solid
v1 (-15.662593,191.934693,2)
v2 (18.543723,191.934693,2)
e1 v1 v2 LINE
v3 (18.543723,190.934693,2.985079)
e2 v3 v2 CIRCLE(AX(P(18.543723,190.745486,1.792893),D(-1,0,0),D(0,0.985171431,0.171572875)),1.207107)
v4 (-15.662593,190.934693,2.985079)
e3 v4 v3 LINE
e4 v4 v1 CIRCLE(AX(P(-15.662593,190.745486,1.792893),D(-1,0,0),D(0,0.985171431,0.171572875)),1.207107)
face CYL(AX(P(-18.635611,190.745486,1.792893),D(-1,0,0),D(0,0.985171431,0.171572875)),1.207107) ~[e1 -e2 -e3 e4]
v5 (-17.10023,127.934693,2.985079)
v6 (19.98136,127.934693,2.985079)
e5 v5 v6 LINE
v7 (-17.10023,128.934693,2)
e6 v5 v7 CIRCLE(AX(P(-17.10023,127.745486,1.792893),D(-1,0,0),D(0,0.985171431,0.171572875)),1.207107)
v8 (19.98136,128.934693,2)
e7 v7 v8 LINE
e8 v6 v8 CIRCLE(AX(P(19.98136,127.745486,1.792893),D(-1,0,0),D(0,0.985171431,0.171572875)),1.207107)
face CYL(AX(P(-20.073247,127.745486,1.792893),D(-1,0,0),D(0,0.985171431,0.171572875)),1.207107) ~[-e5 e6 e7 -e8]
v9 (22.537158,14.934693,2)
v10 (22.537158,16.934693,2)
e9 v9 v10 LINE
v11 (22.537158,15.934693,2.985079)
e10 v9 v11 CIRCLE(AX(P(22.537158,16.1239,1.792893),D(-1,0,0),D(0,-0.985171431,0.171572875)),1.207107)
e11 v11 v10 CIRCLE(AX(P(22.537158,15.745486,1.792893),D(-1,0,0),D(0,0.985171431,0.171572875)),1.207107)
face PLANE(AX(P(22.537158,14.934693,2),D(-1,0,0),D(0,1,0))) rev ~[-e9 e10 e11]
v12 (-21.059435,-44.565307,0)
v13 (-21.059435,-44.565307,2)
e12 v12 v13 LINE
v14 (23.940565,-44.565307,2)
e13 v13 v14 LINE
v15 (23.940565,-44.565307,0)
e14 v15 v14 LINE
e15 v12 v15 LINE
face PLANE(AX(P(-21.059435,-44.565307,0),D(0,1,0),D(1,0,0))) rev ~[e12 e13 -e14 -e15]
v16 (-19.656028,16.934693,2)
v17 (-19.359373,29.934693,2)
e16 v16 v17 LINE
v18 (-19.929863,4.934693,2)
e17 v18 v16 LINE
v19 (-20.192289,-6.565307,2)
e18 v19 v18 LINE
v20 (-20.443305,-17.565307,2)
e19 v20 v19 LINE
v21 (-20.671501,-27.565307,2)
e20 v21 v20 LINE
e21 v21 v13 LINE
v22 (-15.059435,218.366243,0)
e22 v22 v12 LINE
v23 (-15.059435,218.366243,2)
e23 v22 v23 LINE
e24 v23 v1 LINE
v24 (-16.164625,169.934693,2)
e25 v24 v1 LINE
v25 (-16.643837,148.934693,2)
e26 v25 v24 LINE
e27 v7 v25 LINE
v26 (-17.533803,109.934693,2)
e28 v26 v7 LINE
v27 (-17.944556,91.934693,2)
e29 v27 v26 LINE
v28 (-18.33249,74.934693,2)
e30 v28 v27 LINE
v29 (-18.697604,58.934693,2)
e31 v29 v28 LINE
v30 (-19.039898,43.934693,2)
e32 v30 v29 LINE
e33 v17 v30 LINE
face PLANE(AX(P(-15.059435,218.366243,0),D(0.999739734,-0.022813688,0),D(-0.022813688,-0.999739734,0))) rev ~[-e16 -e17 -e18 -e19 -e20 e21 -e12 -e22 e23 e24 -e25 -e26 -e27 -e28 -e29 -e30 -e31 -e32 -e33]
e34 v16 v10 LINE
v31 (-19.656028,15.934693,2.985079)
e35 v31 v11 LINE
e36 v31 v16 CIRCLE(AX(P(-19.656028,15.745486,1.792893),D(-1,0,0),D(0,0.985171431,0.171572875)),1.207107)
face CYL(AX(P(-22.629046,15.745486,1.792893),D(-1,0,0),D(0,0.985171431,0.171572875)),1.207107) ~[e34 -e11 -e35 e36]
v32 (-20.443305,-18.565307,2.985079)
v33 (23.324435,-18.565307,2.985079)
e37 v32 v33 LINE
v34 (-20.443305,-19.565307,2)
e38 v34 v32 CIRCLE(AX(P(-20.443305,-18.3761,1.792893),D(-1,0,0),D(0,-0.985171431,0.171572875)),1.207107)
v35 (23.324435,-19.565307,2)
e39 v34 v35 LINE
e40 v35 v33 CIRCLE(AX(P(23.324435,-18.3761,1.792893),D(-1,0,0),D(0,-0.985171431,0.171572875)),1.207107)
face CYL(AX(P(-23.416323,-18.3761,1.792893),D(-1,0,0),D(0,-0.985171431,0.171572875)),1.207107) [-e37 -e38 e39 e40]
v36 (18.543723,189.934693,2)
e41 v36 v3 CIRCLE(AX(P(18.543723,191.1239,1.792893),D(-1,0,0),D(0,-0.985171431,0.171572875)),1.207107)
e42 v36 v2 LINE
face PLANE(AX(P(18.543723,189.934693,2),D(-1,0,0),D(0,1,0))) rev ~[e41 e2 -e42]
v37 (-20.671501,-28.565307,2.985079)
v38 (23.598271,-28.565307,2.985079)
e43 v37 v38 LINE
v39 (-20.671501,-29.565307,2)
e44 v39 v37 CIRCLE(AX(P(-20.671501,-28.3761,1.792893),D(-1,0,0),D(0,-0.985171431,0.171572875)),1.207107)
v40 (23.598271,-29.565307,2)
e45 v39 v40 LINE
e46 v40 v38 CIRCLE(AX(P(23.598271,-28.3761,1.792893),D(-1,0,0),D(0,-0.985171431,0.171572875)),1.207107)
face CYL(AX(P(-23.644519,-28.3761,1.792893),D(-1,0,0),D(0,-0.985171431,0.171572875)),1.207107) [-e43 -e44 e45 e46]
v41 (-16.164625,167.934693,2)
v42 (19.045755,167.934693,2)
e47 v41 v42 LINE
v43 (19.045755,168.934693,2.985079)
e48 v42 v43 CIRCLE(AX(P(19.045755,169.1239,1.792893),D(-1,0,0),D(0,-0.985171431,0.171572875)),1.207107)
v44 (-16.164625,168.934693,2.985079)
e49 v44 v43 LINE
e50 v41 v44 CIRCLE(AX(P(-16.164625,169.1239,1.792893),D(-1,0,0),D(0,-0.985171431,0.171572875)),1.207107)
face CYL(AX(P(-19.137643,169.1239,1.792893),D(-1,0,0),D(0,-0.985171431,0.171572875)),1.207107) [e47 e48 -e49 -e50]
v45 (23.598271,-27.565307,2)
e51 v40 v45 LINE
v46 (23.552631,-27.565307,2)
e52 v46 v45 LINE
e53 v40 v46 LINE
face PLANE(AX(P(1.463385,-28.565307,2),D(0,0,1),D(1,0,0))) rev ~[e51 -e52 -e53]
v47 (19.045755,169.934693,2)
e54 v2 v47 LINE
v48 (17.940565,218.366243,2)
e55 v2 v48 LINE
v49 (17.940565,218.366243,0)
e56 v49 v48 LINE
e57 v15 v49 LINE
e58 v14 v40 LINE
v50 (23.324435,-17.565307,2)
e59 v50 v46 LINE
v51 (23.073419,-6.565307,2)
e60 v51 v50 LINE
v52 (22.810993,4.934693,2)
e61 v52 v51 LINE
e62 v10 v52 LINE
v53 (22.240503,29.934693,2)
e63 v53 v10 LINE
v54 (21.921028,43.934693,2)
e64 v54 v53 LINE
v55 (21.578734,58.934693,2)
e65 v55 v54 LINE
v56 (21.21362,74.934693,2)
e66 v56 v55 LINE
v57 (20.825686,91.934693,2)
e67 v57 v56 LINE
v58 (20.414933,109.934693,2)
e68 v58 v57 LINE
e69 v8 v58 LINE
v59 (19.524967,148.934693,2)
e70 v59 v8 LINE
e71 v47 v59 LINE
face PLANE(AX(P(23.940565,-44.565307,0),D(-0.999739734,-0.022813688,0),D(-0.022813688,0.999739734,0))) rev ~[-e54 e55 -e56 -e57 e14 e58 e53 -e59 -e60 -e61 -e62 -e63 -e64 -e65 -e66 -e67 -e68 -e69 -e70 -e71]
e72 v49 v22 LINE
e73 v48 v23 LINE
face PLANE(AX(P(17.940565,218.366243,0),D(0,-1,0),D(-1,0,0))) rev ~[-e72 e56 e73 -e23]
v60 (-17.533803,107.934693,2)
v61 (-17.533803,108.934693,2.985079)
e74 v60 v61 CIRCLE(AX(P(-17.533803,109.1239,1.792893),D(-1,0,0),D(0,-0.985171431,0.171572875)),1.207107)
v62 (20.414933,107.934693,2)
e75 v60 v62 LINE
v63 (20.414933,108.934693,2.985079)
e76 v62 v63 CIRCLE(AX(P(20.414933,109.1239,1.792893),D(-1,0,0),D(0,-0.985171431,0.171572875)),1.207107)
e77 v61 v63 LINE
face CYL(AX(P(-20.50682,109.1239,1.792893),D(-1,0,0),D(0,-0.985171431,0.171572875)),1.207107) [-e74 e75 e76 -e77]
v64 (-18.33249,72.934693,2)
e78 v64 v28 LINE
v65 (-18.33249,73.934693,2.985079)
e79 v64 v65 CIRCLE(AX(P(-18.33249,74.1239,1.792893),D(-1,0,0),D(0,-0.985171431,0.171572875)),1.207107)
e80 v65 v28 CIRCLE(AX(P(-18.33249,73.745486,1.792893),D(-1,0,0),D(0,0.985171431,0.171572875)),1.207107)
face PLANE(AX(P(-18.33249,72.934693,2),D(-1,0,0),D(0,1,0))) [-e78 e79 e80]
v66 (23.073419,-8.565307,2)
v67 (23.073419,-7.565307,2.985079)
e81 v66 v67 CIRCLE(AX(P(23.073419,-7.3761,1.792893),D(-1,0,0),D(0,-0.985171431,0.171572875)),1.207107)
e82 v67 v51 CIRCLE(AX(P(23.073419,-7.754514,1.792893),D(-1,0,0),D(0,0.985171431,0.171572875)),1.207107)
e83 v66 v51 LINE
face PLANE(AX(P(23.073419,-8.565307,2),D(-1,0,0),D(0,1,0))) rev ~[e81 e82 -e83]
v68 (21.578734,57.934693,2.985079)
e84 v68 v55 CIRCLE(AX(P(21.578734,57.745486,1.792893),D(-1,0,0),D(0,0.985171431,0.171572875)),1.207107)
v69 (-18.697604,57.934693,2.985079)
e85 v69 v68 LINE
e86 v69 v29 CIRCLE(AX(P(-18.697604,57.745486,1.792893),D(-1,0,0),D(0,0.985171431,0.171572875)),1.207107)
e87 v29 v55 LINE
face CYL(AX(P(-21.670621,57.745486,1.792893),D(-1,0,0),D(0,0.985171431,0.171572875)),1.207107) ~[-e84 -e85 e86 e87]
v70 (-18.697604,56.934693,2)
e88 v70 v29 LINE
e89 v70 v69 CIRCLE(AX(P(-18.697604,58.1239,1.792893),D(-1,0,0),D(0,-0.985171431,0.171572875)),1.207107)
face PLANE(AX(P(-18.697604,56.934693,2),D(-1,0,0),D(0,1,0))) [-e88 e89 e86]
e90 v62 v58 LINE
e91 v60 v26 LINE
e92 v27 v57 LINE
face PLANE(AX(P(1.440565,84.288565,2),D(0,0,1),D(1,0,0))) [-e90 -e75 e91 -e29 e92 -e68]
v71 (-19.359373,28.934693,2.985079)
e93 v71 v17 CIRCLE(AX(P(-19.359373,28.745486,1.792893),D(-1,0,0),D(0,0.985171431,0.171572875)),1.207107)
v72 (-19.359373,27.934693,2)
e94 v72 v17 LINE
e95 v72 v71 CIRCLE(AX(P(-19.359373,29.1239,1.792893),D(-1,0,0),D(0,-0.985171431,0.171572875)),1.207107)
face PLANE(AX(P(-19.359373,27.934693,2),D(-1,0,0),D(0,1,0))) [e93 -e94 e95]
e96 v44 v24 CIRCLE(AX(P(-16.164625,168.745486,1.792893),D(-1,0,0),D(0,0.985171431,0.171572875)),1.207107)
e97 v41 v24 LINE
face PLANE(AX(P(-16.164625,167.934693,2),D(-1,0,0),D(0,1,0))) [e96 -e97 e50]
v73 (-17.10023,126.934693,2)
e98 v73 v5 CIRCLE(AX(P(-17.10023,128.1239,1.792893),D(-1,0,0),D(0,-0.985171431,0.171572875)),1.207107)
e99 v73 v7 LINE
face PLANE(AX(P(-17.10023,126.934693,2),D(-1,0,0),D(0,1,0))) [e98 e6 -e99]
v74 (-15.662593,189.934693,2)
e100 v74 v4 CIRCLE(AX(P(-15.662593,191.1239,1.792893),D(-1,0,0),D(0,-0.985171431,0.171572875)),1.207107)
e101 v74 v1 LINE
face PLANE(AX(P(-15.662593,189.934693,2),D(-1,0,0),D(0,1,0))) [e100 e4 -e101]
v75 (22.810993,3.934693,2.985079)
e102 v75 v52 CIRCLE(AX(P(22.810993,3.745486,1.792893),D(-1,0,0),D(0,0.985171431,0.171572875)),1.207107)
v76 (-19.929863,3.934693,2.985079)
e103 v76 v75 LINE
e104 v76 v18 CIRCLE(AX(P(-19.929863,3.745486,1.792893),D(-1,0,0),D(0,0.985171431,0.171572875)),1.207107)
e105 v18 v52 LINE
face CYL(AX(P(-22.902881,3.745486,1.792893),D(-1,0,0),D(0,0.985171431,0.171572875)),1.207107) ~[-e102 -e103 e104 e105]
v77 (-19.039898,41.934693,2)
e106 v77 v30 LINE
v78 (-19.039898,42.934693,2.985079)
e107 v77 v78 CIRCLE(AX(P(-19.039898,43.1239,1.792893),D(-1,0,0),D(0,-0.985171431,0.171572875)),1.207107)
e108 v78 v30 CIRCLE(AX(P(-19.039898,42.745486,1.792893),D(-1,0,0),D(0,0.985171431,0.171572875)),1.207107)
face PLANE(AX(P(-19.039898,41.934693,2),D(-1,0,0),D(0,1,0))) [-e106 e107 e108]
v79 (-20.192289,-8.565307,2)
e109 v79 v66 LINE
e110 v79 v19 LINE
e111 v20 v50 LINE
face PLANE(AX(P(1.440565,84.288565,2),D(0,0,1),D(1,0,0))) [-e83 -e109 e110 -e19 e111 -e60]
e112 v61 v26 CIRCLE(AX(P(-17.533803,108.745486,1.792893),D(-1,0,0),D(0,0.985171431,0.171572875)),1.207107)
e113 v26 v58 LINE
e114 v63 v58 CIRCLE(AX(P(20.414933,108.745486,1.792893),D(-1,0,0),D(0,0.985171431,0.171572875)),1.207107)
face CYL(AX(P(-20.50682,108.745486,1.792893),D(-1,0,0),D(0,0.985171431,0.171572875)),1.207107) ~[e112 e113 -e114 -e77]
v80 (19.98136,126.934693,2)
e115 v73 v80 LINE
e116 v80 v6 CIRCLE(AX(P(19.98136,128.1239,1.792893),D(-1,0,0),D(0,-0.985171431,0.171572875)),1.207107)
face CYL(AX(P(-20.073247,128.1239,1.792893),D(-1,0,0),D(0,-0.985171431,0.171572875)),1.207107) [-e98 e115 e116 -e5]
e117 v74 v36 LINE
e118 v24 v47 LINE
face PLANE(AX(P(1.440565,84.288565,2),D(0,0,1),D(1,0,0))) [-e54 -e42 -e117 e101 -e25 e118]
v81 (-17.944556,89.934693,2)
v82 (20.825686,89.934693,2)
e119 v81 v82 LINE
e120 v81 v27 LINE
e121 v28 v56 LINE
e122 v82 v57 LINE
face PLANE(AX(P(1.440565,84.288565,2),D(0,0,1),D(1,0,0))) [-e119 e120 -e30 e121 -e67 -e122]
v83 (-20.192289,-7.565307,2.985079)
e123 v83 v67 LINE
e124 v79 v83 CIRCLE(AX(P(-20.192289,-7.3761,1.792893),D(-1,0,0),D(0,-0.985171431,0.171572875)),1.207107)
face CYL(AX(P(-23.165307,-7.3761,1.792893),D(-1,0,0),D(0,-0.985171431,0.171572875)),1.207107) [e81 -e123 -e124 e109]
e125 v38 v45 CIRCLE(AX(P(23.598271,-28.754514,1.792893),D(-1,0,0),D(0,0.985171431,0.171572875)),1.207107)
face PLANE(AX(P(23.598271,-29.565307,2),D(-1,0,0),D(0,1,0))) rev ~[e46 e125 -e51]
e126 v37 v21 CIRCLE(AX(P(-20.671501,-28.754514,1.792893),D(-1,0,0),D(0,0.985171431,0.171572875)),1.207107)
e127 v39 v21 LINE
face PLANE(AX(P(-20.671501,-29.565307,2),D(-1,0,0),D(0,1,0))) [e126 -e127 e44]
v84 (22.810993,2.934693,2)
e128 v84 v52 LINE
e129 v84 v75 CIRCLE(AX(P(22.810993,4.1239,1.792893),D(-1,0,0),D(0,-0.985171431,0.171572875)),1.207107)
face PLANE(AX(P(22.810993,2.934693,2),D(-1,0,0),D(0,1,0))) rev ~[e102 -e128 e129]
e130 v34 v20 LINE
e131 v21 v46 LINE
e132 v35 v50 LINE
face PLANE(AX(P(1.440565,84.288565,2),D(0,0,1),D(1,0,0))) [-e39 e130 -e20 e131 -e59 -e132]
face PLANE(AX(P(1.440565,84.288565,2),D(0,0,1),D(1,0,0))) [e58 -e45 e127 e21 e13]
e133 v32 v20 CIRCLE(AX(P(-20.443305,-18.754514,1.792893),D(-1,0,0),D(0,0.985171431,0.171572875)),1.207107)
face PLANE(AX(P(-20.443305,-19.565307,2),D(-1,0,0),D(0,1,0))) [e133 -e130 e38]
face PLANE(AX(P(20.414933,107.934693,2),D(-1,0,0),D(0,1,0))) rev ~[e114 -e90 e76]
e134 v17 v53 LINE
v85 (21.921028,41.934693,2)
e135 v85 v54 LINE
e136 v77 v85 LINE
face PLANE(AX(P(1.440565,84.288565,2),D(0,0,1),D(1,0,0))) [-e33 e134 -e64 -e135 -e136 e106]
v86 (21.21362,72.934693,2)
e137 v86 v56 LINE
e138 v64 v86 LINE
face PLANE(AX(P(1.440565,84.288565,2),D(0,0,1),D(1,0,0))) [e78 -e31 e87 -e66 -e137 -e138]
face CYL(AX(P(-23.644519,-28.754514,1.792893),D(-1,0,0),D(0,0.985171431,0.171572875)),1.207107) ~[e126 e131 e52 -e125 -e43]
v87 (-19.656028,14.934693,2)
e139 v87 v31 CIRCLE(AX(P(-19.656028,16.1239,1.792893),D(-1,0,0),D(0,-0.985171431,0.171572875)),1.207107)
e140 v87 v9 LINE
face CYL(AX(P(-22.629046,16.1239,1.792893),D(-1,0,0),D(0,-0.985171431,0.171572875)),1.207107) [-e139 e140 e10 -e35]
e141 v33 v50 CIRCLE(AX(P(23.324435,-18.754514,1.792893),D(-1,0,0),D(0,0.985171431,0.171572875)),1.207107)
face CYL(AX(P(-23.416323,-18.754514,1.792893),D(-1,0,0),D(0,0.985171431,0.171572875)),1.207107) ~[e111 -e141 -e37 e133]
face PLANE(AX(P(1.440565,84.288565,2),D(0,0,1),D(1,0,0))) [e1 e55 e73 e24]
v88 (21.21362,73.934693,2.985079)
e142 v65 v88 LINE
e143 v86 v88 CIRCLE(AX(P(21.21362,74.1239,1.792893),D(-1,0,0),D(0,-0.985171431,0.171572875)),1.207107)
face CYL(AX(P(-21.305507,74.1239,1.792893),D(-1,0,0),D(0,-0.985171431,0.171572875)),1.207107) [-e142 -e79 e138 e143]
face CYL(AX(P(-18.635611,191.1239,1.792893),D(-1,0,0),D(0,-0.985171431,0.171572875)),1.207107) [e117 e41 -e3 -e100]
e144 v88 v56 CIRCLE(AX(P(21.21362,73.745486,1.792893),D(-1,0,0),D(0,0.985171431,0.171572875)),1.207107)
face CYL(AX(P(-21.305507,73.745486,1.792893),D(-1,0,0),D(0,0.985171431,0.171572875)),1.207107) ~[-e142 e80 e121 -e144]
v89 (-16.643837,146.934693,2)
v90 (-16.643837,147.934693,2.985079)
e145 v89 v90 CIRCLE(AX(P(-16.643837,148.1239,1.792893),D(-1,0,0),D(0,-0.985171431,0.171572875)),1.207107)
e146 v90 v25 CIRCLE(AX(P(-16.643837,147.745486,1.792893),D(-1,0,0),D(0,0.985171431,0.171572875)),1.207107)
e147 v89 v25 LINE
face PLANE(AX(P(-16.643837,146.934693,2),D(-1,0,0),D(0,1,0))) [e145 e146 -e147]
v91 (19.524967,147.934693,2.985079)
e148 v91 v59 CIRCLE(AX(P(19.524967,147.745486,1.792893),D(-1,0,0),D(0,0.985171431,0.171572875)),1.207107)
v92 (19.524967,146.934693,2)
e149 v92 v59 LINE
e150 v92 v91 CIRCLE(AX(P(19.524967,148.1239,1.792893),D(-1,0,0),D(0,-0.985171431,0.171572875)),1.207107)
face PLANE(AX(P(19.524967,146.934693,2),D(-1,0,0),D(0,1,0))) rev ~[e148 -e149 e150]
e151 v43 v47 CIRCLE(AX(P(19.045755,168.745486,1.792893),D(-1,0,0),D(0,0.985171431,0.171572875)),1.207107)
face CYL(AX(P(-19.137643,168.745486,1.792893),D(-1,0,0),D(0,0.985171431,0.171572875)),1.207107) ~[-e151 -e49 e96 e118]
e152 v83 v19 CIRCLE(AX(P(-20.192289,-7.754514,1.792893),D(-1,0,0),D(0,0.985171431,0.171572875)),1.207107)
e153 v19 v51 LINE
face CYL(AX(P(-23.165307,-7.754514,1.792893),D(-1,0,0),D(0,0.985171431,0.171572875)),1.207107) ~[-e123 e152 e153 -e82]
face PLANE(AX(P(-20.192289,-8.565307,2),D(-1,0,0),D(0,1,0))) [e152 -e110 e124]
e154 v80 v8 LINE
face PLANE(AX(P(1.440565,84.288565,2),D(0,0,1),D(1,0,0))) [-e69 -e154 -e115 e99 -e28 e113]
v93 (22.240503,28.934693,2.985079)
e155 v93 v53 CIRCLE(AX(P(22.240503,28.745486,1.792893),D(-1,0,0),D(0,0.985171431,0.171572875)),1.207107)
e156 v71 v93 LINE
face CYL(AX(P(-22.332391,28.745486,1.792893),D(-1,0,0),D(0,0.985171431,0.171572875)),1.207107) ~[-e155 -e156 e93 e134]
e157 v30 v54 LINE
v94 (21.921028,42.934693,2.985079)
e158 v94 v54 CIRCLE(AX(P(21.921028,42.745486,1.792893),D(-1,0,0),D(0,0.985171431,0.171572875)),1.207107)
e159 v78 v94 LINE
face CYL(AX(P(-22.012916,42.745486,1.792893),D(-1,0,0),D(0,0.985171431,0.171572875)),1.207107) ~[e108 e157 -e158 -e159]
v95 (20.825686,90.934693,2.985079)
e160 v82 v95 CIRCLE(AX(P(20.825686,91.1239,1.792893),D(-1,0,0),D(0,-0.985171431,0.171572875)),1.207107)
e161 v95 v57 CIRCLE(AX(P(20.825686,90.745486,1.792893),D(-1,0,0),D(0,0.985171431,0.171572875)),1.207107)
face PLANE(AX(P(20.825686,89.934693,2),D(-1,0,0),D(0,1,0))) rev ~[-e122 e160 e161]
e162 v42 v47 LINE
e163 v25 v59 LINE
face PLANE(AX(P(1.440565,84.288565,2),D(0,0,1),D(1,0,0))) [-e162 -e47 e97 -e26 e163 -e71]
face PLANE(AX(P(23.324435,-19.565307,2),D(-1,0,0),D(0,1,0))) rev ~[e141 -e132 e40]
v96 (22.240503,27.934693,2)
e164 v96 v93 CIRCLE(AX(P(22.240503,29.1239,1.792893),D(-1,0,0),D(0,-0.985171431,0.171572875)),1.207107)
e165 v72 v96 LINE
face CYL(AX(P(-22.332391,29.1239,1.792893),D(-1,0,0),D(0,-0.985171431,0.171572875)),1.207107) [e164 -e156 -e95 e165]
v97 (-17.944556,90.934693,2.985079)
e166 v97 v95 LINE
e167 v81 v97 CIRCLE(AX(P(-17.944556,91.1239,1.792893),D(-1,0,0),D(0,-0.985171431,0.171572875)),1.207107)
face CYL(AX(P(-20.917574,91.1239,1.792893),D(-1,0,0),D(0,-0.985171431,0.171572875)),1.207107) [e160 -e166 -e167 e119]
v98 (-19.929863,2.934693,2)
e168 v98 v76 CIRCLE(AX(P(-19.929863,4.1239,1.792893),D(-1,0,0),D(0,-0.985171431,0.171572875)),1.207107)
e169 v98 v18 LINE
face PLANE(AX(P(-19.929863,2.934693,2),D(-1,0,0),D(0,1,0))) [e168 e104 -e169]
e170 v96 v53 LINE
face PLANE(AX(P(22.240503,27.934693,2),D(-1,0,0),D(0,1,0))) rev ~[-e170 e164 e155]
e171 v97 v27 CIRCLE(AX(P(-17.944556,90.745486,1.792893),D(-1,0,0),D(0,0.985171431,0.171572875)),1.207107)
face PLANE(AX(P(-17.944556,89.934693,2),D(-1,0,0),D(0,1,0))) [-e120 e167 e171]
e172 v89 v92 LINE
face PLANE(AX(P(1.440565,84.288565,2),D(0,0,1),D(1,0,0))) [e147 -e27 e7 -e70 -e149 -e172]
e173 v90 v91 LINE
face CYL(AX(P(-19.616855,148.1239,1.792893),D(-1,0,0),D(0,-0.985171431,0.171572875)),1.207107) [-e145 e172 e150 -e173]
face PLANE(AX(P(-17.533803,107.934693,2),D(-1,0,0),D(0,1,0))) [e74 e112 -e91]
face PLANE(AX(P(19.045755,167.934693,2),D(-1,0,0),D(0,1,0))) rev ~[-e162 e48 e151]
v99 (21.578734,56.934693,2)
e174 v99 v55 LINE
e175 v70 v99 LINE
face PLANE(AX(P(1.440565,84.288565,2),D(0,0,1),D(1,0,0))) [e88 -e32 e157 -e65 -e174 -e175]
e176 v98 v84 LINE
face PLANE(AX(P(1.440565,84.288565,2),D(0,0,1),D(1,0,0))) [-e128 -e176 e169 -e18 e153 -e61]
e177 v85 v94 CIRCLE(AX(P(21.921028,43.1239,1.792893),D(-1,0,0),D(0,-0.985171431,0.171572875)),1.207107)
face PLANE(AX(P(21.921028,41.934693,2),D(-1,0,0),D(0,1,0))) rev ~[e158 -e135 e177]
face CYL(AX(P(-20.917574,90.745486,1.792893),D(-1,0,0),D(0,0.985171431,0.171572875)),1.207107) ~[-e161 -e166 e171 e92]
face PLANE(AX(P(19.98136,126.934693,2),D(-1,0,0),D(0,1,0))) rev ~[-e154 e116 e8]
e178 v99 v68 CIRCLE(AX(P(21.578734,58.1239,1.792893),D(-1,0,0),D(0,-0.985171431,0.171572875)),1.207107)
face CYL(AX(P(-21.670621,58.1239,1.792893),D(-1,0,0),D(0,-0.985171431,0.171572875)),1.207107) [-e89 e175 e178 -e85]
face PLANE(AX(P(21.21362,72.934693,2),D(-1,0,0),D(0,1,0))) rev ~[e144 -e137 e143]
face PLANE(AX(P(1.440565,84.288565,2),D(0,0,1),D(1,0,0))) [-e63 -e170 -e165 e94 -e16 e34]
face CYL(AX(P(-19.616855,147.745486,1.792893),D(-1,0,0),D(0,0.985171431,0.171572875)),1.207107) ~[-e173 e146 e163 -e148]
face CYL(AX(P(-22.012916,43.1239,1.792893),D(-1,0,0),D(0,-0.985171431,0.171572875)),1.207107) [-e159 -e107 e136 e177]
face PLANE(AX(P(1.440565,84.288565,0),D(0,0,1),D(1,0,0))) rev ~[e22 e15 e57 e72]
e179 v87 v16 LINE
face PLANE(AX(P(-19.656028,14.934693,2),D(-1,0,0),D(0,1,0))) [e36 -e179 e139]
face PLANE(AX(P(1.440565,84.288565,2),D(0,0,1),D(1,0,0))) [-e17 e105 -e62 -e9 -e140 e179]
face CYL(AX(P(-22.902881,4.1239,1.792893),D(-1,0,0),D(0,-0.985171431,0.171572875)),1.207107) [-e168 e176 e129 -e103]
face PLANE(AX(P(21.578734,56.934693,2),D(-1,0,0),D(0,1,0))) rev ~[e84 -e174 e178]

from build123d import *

# Parameters (mm, degrees)
F1_DEPTH     = 2
F2_W         = 44.2697719236
F2_H         = 2
F2_W_2       = 43.7677401211
F2_W_3       = 43.2657083186
F2_W_4       = 42.7408568887
F2_W_5       = 42.1931858314
F2_W_6       = 41.5998755193
F2_W_7       = 40.9609259524
F2_W_8       = 40.2763371308
F2_W_9       = 39.5461090544
F2_W_10      = 38.7702417233
F2_W_11      = 37.9487351373
F2_W_12      = 37.0815892966
F2_W_13      = 36.1688042011
F2_W_14      = 35.2103798508
F2_W_15      = 34.2063162458
F3_DEPTH     = 1
F4_T1_DEPTH  = 50.2158074986
F4_T3_DEPTH  = 3.0186569416
F4_T5_DEPTH  = 47.197150557
F4_T7_DEPTH  = 49.7137756961
F4_T9_DEPTH  = 49.2117438936
F4_T11_DEPTH = 48.6868924637
F4_T13_DEPTH = 48.1392214064
F4_T15_DEPTH = 47.5459110943
F4_T17_DEPTH = 46.9069615275
F4_T19_DEPTH = 46.2223727058
F4_T21_DEPTH = 45.4921446294
F4_T23_DEPTH = 44.7162772983
F4_T25_DEPTH = 43.8947707123
F4_T27_DEPTH = 43.0276248716
F4_T29_DEPTH = 42.1148397761
F4_T31_DEPTH = 41.1564154259
F4_T33_DEPTH = 40.1523518208


# Not quite as in the source:
# - a fillet or chamfer that OpenCascade refuses, or shapes differently, is made with other operations: its cross-section is extruded or revolved along the edge and cut away or added


with BuildPart() as f1:
    # F0 (on Top) → F1 (new body)
    with BuildSketch(Plane.XY):
        Polygon((17.9405650105, 218.366242675), (-15.0594349895, 218.366242675), (-21.0594349895, -44.5653073527), (23.9405650105, -44.5653073527), align=None)
    extrude(amount=F1_DEPTH)

    # F2 (on face) → F3 (join)
    with BuildSketch(Plane.XY.offset(2)):
        with Locations((1.4633846378, -28.5653073527)):
            Rectangle(F2_W, F2_H)
        with Locations((1.4405650105, -18.5653073527)):
            Rectangle(F2_W_2, F2_H)
        with Locations((1.4405650105, -7.5653073527)):
            Rectangle(F2_W_3, F2_H)
        with Locations((1.4405650105, 3.9346926473)):
            Rectangle(F2_W_4, F2_H)
        with Locations((1.4405650105, 15.9346926473)):
            Rectangle(F2_W_5, F2_H)
        with Locations((1.4405650105, 28.9346926473)):
            Rectangle(F2_W_6, F2_H)
        with Locations((1.4405650105, 42.9346926473)):
            Rectangle(F2_W_7, F2_H)
        with Locations((1.4405650105, 57.9346926473)):
            Rectangle(F2_W_8, F2_H)
        with Locations((1.4405650105, 73.9346926473)):
            Rectangle(F2_W_9, F2_H)
        with Locations((1.4405650105, 90.9346926473)):
            Rectangle(F2_W_10, F2_H)
        with Locations((1.4405650105, 108.9346926473)):
            Rectangle(F2_W_11, F2_H)
        with Locations((1.4405650105, 127.9346926473)):
            Rectangle(F2_W_12, F2_H)
        with Locations((1.4405650105, 147.9346926473)):
            Rectangle(F2_W_13, F2_H)
        with Locations((1.4405650105, 168.9346926473)):
            Rectangle(F2_W_14, F2_H)
        with Locations((1.4405650105, 190.9346926473)):
            Rectangle(F2_W_15, F2_H)
    extrude(amount=F3_DEPTH)

    # F4: fillet of radius 1.2071067812 on 30 edges, made by hand

    # F4_s2 → F4_t1 (cut)
    with BuildSketch(Plane.YZ.offset(-23.6445191115)):
        with BuildLine():
            ThreePointArc((-29.5653073527, 2), (-29.1529872247, 2.7167727513), (-28.3761002377, 3))
            Line((-28.3761002377, 3), (-29.5653073527, 3))
            Line((-29.5653073527, 3), (-29.5653073527, 2))
        make_face()
    extrude(amount=F4_T1_DEPTH, mode=Mode.SUBTRACT)

    # F4_s4 → F4_t3 (cut)
    with BuildSketch(Plane.YZ.offset(23.5526314455)):
        with BuildLine():
            ThreePointArc((-27.5653073527, 2), (-27.9776274807, 2.7167727513), (-28.7545144677, 3))
            Line((-28.7545144677, 3), (-27.5653073527, 3))
            Line((-27.5653073527, 3), (-27.5653073527, 2))
        make_face()
    extrude(amount=F4_T3_DEPTH, mode=Mode.SUBTRACT)

    # F4_s6 → F4_t5 (cut)
    with BuildSketch(Plane.YZ.offset(-23.6445191115)):
        with BuildLine():
            ThreePointArc((-27.5653073527, 2), (-27.9776274807, 2.7167727513), (-28.7545144677, 3))
            Line((-28.7545144677, 3), (-27.5653073527, 3))
            Line((-27.5653073527, 3), (-27.5653073527, 2))
        make_face()
    extrude(amount=F4_T5_DEPTH, mode=Mode.SUBTRACT)

    # F4_s8 → F4_t7 (cut)
    with BuildSketch(Plane.YZ.offset(-23.4163228376)):
        with BuildLine():
            ThreePointArc((-19.5653073527, 2), (-19.1529872247, 2.7167727513), (-18.3761002377, 3))
            Line((-18.3761002377, 3), (-19.5653073527, 3))
            Line((-19.5653073527, 3), (-19.5653073527, 2))
        make_face()
        with BuildLine():
            ThreePointArc((-17.5653073527, 2), (-17.9776274807, 2.7167727513), (-18.7545144677, 3))
            Line((-18.7545144677, 3), (-17.5653073527, 3))
            Line((-17.5653073527, 3), (-17.5653073527, 2))
        make_face()
    extrude(amount=F4_T7_DEPTH, mode=Mode.SUBTRACT)

    # F4_s10 → F4_t9 (cut)
    with BuildSketch(Plane.YZ.offset(-23.1653069363)):
        with BuildLine():
            ThreePointArc((-8.5653073527, 2), (-8.1529872247, 2.7167727513), (-7.3761002377, 3))
            Line((-7.3761002377, 3), (-8.5653073527, 3))
            Line((-8.5653073527, 3), (-8.5653073527, 2))
        make_face()
        with BuildLine():
            ThreePointArc((-6.5653073527, 2), (-6.9776274807, 2.7167727513), (-7.7545144677, 3))
            Line((-7.7545144677, 3), (-6.5653073527, 3))
            Line((-6.5653073527, 3), (-6.5653073527, 2))
        make_face()
    extrude(amount=F4_T9_DEPTH, mode=Mode.SUBTRACT)

    # F4_s12 → F4_t11 (cut)
    with BuildSketch(Plane.YZ.offset(-22.9028812214)):
        with BuildLine():
            ThreePointArc((2.9346926473, 2), (3.3470127753, 2.7167727513), (4.1238997623, 3))
            Line((4.1238997623, 3), (2.9346926473, 3))
            Line((2.9346926473, 3), (2.9346926473, 2))
        make_face()
        with BuildLine():
            ThreePointArc((4.9346926473, 2), (4.5223725193, 2.7167727513), (3.7454855323, 3))
            Line((3.7454855323, 3), (4.9346926473, 3))
            Line((4.9346926473, 3), (4.9346926473, 2))
        make_face()
    extrude(amount=F4_T11_DEPTH, mode=Mode.SUBTRACT)

    # F4_s14 → F4_t13 (cut)
    with BuildSketch(Plane.YZ.offset(-22.6290456927)):
        with BuildLine():
            ThreePointArc((14.9346926473, 2), (15.3470127753, 2.7167727513), (16.1238997623, 3))
            Line((16.1238997623, 3), (14.9346926473, 3))
            Line((14.9346926473, 3), (14.9346926473, 2))
        make_face()
        with BuildLine():
            ThreePointArc((16.9346926473, 2), (16.5223725193, 2.7167727513), (15.7454855323, 3))
            Line((15.7454855323, 3), (16.9346926473, 3))
            Line((16.9346926473, 3), (16.9346926473, 2))
        make_face()
    extrude(amount=F4_T13_DEPTH, mode=Mode.SUBTRACT)

    # F4_s16 → F4_t15 (cut)
    with BuildSketch(Plane.YZ.offset(-22.3323905367)):
        with BuildLine():
            ThreePointArc((27.9346926473, 2), (28.3470127753, 2.7167727513), (29.1238997623, 3))
            Line((29.1238997623, 3), (27.9346926473, 3))
            Line((27.9346926473, 3), (27.9346926473, 2))
        make_face()
        with BuildLine():
            ThreePointArc((29.9346926473, 2), (29.5223725193, 2.7167727513), (28.7454855323, 3))
            Line((28.7454855323, 3), (29.9346926473, 3))
            Line((29.9346926473, 3), (29.9346926473, 2))
        make_face()
    extrude(amount=F4_T15_DEPTH, mode=Mode.SUBTRACT)

    # F4_s18 → F4_t17 (cut)
    with BuildSketch(Plane.YZ.offset(-22.0129157533)):
        with BuildLine():
            ThreePointArc((41.9346926473, 2), (42.3470127753, 2.7167727513), (43.1238997623, 3))
            Line((43.1238997623, 3), (41.9346926473, 3))
            Line((41.9346926473, 3), (41.9346926473, 2))
        make_face()
        with BuildLine():
            ThreePointArc((43.9346926473, 2), (43.5223725193, 2.7167727513), (42.7454855323, 3))
            Line((42.7454855323, 3), (43.9346926473, 3))
            Line((43.9346926473, 3), (43.9346926473, 2))
        make_face()
    extrude(amount=F4_T17_DEPTH, mode=Mode.SUBTRACT)

    # F4_s20 → F4_t19 (cut)
    with BuildSketch(Plane.YZ.offset(-21.6706213425)):
        with BuildLine():
            ThreePointArc((56.9346926473, 2), (57.3470127753, 2.7167727513), (58.1238997623, 3))
            Line((58.1238997623, 3), (56.9346926473, 3))
            Line((56.9346926473, 3), (56.9346926473, 2))
        make_face()
        with BuildLine():
            ThreePointArc((58.9346926473, 2), (58.5223725193, 2.7167727513), (57.7454855323, 3))
            Line((57.7454855323, 3), (58.9346926473, 3))
            Line((58.9346926473, 3), (58.9346926473, 2))
        make_face()
    extrude(amount=F4_T19_DEPTH, mode=Mode.SUBTRACT)

    # F4_s22 → F4_t21 (cut)
    with BuildSketch(Plane.YZ.offset(-21.3055073043)):
        with BuildLine():
            ThreePointArc((72.9346926473, 2), (73.3470127753, 2.7167727513), (74.1238997623, 3))
            Line((74.1238997623, 3), (72.9346926473, 3))
            Line((72.9346926473, 3), (72.9346926473, 2))
        make_face()
        with BuildLine():
            ThreePointArc((74.9346926473, 2), (74.5223725193, 2.7167727513), (73.7454855323, 3))
            Line((73.7454855323, 3), (74.9346926473, 3))
            Line((74.9346926473, 3), (74.9346926473, 2))
        make_face()
    extrude(amount=F4_T21_DEPTH, mode=Mode.SUBTRACT)

    # F4_s24 → F4_t23 (cut)
    with BuildSketch(Plane.YZ.offset(-20.9175736387)):
        with BuildLine():
            ThreePointArc((89.9346926473, 2), (90.3470127753, 2.7167727513), (91.1238997623, 3))
            Line((91.1238997623, 3), (89.9346926473, 3))
            Line((89.9346926473, 3), (89.9346926473, 2))
        make_face()
        with BuildLine():
            ThreePointArc((91.9346926473, 2), (91.5223725193, 2.7167727513), (90.7454855323, 3))
            Line((90.7454855323, 3), (91.9346926473, 3))
            Line((91.9346926473, 3), (91.9346926473, 2))
        make_face()
    extrude(amount=F4_T23_DEPTH, mode=Mode.SUBTRACT)

    # F4_s26 → F4_t25 (cut)
    with BuildSketch(Plane.YZ.offset(-20.5068203457)):
        with BuildLine():
            ThreePointArc((107.9346926473, 2), (108.3470127753, 2.7167727513), (109.1238997623, 3))
            Line((109.1238997623, 3), (107.9346926473, 3))
            Line((107.9346926473, 3), (107.9346926473, 2))
        make_face()
        with BuildLine():
            ThreePointArc((109.9346926473, 2), (109.5223725193, 2.7167727513), (108.7454855323, 3))
            Line((108.7454855323, 3), (109.9346926473, 3))
            Line((109.9346926473, 3), (109.9346926473, 2))
        make_face()
    extrude(amount=F4_T25_DEPTH, mode=Mode.SUBTRACT)

    # F4_s28 → F4_t27 (cut)
    with BuildSketch(Plane.YZ.offset(-20.0732474254)):
        with BuildLine():
            ThreePointArc((126.9346926473, 2), (127.3470127753, 2.7167727513), (128.1238997623, 3))
            Line((128.1238997623, 3), (126.9346926473, 3))
            Line((126.9346926473, 3), (126.9346926473, 2))
        make_face()
        with BuildLine():
            ThreePointArc((128.9346926473, 2), (128.5223725193, 2.7167727513), (127.7454855323, 3))
            Line((127.7454855323, 3), (128.9346926473, 3))
            Line((128.9346926473, 3), (128.9346926473, 2))
        make_face()
    extrude(amount=F4_T27_DEPTH, mode=Mode.SUBTRACT)

    # F4_s30 → F4_t29 (cut)
    with BuildSketch(Plane.YZ.offset(-19.6168548776)):
        with BuildLine():
            ThreePointArc((146.9346926473, 2), (147.3470127753, 2.7167727513), (148.1238997623, 3))
            Line((148.1238997623, 3), (146.9346926473, 3))
            Line((146.9346926473, 3), (146.9346926473, 2))
        make_face()
        with BuildLine():
            ThreePointArc((148.9346926473, 2), (148.5223725193, 2.7167727513), (147.7454855323, 3))
            Line((147.7454855323, 3), (148.9346926473, 3))
            Line((148.9346926473, 3), (148.9346926473, 2))
        make_face()
    extrude(amount=F4_T29_DEPTH, mode=Mode.SUBTRACT)

    # F4_s32 → F4_t31 (cut)
    with BuildSketch(Plane.YZ.offset(-19.1376427025)):
        with BuildLine():
            ThreePointArc((167.9346926473, 2), (168.3470127753, 2.7167727513), (169.1238997623, 3))
            Line((169.1238997623, 3), (167.9346926473, 3))
            Line((167.9346926473, 3), (167.9346926473, 2))
        make_face()
        with BuildLine():
            ThreePointArc((169.9346926473, 2), (169.5223725193, 2.7167727513), (168.7454855323, 3))
            Line((168.7454855323, 3), (169.9346926473, 3))
            Line((169.9346926473, 3), (169.9346926473, 2))
        make_face()
    extrude(amount=F4_T31_DEPTH, mode=Mode.SUBTRACT)

    # F4_s34 → F4_t33 (cut)
    with BuildSketch(Plane.YZ.offset(-18.6356109)):
        with BuildLine():
            ThreePointArc((189.9346926473, 2), (190.3470127753, 2.7167727513), (191.1238997623, 3))
            Line((191.1238997623, 3), (189.9346926473, 3))
            Line((189.9346926473, 3), (189.9346926473, 2))
        make_face()
        with BuildLine():
            ThreePointArc((191.9346926473, 2), (191.5223725193, 2.7167727513), (190.7454855323, 3))
            Line((190.7454855323, 3), (191.9346926473, 3))
            Line((191.9346926473, 3), (191.9346926473, 2))
        make_face()
    extrude(amount=F4_T33_DEPTH, mode=Mode.SUBTRACT)


solid = f1.part
